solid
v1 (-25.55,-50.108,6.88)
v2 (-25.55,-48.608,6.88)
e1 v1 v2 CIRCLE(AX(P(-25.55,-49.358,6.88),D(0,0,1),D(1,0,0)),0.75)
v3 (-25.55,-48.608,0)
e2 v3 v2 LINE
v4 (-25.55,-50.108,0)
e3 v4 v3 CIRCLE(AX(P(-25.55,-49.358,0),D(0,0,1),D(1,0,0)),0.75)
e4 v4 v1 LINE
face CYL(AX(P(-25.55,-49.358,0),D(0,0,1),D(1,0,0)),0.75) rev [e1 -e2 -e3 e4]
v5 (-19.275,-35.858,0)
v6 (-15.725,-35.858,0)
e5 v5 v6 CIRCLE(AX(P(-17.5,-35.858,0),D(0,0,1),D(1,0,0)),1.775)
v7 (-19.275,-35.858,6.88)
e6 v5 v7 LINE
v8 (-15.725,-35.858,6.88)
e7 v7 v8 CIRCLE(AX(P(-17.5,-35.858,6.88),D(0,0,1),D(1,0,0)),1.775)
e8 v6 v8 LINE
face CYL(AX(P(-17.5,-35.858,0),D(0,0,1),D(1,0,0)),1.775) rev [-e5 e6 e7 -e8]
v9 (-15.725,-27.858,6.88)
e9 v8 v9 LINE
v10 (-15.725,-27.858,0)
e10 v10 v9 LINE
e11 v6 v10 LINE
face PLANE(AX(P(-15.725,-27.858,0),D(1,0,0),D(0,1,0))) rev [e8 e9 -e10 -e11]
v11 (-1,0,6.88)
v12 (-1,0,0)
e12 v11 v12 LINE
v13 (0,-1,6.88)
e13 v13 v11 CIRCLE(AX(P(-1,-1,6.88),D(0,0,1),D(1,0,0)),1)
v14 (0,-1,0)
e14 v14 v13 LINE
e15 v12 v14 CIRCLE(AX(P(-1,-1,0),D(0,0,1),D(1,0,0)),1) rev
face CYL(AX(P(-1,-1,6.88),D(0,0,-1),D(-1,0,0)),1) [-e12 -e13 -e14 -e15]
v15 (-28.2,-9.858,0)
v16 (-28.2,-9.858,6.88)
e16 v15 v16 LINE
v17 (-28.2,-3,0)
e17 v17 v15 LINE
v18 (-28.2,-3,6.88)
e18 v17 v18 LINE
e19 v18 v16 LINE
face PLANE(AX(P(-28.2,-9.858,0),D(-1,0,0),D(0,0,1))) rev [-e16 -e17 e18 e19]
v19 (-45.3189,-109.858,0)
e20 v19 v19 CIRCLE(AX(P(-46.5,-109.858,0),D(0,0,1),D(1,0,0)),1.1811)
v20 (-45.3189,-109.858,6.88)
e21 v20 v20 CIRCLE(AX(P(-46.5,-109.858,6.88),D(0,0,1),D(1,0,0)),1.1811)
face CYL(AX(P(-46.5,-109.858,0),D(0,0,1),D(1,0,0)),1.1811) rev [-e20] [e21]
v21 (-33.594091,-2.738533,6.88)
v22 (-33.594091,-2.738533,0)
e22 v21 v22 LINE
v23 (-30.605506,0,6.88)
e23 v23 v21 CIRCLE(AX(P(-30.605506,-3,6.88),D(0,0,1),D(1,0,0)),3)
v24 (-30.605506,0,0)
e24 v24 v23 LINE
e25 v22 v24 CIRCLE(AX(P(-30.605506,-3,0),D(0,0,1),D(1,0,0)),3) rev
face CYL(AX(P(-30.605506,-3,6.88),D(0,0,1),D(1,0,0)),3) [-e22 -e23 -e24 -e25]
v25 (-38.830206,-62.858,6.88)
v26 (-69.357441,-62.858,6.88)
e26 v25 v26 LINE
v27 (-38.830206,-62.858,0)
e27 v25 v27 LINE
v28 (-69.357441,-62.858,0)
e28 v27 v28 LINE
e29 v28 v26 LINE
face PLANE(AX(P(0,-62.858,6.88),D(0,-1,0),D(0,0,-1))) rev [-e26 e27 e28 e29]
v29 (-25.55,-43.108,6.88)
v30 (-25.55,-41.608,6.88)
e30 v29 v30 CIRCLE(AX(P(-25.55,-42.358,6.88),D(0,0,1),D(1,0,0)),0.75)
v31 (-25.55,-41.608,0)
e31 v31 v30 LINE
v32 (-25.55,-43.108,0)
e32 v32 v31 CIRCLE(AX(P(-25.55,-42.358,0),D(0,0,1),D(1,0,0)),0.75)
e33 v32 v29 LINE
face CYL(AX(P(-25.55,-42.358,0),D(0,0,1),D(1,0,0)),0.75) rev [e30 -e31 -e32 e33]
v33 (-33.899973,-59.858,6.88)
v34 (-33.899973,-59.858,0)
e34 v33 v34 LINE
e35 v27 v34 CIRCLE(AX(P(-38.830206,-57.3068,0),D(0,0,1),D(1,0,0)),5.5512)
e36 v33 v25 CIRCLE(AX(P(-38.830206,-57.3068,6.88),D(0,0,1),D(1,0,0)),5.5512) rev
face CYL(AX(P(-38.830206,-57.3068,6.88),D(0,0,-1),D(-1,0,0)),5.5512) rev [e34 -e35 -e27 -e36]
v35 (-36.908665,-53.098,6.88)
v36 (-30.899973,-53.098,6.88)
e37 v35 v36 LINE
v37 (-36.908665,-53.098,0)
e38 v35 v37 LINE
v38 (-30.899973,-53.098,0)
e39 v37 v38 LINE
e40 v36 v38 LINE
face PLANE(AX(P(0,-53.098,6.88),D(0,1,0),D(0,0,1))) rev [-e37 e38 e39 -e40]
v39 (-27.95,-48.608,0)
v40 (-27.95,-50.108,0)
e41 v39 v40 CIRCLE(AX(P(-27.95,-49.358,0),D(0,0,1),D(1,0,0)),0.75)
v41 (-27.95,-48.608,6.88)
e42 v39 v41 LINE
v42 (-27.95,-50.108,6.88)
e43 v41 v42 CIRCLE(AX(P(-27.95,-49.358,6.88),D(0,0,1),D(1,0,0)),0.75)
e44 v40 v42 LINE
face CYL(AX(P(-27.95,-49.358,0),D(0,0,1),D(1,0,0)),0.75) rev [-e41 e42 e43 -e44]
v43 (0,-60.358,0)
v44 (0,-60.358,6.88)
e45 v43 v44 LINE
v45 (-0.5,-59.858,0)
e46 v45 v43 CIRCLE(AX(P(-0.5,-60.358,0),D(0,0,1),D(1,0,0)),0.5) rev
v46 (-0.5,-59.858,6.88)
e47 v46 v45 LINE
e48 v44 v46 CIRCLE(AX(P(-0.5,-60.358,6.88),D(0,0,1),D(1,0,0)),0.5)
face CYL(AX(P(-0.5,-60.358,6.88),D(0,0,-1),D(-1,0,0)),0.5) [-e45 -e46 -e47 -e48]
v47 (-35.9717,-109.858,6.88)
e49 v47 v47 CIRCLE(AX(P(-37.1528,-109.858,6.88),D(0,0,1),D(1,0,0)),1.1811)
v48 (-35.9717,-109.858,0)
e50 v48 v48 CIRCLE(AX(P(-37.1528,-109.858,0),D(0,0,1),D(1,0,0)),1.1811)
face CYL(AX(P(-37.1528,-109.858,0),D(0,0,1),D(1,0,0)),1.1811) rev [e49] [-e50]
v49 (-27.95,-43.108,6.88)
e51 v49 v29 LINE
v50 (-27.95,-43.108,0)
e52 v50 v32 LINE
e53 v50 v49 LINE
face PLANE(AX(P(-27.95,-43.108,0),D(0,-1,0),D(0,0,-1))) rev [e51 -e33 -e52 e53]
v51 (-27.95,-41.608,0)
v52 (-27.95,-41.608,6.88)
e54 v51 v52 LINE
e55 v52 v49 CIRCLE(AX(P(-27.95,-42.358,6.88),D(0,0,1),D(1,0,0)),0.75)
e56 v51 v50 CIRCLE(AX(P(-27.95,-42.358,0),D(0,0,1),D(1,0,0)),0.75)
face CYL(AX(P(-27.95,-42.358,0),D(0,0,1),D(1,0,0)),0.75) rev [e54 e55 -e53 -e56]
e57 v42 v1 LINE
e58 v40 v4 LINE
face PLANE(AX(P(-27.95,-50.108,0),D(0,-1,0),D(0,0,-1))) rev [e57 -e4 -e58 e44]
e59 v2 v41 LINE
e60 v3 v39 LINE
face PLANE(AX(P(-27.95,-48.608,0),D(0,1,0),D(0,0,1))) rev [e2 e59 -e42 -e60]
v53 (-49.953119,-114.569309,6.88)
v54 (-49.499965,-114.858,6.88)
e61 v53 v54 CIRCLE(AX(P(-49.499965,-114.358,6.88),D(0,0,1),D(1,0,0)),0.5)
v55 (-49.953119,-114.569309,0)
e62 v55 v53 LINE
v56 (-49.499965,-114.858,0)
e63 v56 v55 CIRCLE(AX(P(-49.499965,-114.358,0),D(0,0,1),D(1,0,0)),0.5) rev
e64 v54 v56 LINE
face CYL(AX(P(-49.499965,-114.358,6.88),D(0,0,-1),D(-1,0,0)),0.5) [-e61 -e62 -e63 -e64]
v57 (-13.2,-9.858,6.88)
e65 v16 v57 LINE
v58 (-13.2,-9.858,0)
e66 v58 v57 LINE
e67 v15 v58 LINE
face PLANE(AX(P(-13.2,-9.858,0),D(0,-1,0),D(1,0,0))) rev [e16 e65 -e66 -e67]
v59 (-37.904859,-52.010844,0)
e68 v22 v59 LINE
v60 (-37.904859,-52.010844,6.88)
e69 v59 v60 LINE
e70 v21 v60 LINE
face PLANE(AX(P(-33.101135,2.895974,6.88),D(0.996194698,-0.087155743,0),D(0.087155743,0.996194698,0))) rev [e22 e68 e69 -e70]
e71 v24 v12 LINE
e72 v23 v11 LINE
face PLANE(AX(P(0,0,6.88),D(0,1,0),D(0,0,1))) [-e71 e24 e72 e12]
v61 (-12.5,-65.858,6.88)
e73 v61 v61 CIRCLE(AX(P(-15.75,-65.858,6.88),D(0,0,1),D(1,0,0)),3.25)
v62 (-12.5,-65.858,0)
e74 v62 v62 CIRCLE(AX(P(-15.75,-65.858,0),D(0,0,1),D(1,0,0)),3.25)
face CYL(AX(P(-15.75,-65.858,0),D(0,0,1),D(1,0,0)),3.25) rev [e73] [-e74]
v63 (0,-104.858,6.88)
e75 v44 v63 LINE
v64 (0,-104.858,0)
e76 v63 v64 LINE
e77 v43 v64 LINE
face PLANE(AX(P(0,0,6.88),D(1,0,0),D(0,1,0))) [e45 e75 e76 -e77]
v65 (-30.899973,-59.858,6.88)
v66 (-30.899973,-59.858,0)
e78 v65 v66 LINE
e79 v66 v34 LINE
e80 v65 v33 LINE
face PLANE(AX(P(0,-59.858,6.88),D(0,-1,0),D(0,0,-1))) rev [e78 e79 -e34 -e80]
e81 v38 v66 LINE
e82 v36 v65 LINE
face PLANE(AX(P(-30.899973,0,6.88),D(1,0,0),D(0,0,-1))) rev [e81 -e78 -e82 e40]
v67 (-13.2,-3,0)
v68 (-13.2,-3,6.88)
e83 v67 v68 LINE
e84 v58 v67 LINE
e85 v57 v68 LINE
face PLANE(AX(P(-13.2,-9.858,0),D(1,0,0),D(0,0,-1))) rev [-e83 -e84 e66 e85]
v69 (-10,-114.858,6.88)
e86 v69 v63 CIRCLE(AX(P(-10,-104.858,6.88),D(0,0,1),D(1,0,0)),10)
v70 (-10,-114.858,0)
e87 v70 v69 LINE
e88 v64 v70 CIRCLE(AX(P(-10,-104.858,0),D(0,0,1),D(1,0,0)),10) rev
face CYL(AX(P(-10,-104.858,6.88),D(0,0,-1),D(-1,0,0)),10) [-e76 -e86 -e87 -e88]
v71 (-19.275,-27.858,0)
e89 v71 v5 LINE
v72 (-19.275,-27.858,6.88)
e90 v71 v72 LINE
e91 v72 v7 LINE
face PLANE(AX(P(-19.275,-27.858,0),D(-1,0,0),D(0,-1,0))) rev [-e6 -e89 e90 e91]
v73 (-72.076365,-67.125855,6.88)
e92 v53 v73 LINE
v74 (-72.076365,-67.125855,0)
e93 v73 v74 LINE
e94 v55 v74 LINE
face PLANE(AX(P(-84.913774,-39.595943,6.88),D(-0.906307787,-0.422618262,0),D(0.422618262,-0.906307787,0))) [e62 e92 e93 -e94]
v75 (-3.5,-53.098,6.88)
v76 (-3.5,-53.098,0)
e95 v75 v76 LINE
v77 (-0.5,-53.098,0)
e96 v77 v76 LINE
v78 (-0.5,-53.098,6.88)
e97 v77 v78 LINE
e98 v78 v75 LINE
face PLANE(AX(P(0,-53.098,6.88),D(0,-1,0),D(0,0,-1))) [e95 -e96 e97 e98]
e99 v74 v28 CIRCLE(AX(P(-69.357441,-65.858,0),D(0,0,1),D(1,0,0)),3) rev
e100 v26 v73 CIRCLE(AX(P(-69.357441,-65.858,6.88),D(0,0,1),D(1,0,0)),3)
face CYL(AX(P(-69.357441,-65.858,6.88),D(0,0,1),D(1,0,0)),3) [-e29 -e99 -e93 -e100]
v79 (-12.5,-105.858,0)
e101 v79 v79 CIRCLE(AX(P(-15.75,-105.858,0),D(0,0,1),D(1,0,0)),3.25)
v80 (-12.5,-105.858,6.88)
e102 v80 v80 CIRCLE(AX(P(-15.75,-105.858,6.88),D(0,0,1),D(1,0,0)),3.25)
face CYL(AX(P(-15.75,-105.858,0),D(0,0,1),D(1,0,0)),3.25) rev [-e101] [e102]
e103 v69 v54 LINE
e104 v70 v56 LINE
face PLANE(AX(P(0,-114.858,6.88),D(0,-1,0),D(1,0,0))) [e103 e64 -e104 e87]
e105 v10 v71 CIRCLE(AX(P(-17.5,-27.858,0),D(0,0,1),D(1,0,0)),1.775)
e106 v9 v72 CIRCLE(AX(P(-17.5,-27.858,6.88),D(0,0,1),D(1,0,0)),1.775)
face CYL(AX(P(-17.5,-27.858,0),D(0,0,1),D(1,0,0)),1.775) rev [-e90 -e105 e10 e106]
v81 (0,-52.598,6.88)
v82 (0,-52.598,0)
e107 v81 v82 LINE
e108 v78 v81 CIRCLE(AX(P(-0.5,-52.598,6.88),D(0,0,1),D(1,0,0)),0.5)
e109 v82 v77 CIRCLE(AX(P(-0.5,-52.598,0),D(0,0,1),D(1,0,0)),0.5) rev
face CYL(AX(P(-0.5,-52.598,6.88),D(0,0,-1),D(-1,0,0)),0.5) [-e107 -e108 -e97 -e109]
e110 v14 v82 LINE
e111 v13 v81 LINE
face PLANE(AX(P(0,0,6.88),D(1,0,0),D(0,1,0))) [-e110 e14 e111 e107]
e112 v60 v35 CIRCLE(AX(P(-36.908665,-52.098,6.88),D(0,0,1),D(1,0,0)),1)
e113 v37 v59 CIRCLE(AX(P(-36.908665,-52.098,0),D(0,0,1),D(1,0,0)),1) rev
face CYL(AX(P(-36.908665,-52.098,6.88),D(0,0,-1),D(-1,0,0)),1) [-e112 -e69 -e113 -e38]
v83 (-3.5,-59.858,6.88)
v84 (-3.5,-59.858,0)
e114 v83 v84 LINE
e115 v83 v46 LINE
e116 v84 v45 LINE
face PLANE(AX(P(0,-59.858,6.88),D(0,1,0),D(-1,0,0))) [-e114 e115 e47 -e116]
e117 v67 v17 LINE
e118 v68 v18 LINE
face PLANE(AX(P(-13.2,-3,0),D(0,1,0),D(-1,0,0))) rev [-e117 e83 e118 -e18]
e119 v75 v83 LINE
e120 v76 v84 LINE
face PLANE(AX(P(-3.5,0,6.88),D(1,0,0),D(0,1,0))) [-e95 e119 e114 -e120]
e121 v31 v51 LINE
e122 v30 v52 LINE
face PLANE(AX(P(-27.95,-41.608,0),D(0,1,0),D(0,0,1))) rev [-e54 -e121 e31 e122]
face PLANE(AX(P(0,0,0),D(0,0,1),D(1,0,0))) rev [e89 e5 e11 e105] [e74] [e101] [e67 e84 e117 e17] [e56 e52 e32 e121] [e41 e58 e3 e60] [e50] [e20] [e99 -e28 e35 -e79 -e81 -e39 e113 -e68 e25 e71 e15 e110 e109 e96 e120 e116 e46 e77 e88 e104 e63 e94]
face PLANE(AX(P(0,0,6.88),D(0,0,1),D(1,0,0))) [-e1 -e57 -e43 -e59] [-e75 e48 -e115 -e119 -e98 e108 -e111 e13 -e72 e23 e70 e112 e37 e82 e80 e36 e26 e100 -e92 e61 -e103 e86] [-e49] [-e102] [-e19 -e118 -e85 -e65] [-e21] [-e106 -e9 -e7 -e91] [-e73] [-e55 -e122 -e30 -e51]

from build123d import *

# Parameters (mm, degrees)
BOSS_EXTRUDE1_DEPTH = 6.88
SKETCH2_W           = 15
SKETCH2_H           = 6.858
CUT_EXTRUDE1_DEPTH  = 137.841297579
SKETCH3_R           = 3.25
CUT_EXTRUDE2_DEPTH  = 137.841297579
SKETCH4_R           = 1.1811
CUT_EXTRUDE3_DEPTH  = 137.841297579
CUT_EXTRUDE4_DEPTH  = 137.841297579
FILLET1_R           = 10
FILLET2_R           = 3
FILLET3_R           = 0.5
FILLET4_R           = 1
FILLET5_R           = 5.5512


with BuildPart() as part:
    # Sketch1 → Boss-Extrude1 (new body)
    with BuildSketch(Plane.XY):
        Polygon((-33.3545, 0), (0, 0), (0, -53.098), (-3.5, -53.098), (-3.5, -59.858), (0, -59.858), (0, -114.858), (-49.8185, -114.858), (-74.066498224, -62.858), (-33.899973056, -62.858), (-33.899973056, -59.858), (-30.899973056, -59.858), (-30.899973056, -53.098), (-37.999973056, -53.098), align=None)
    extrude(amount=BOSS_EXTRUDE1_DEPTH)

    # Sketch2 → Cut-Extrude1 (cut, through all)
    with BuildSketch(Plane.XY.offset(6.88)):
        with Locations((-20.7, -6.429)):
            Rectangle(SKETCH2_W, SKETCH2_H)
    extrude(amount=-CUT_EXTRUDE1_DEPTH, mode=Mode.SUBTRACT)

    # Sketch3 → Cut-Extrude2 (cut, through all)
    with BuildSketch(Plane.XY.offset(6.88)):
        with Locations((-15.75, -65.858)):
            Circle(SKETCH3_R)
        with Locations((-15.75, -105.858)):
            Circle(SKETCH3_R)
    extrude(amount=-CUT_EXTRUDE2_DEPTH, mode=Mode.SUBTRACT)

    # Sketch4 → Cut-Extrude3 (cut, through all)
    with BuildSketch(Plane.XY.offset(6.88)):
        with Locations((-46.5, -109.858)):
            Circle(SKETCH4_R)
        with Locations((-37.1528, -109.858)):
            Circle(SKETCH4_R)
        with BuildLine():
            Line((-27.95, -48.608), (-25.55, -48.608))
            ThreePointArc((-25.55, -48.608), (-24.8, -49.358), (-25.55, -50.108))
            Line((-25.55, -50.108), (-27.95, -50.108))
            ThreePointArc((-27.95, -50.108), (-28.7, -49.358), (-27.95, -48.608))
        make_face()
        with BuildLine():
            Line((-27.95, -41.608), (-25.55, -41.608))
            ThreePointArc((-25.55, -41.608), (-24.8, -42.358), (-25.55, -43.108))
            Line((-25.55, -43.108), (-27.95, -43.108))
            ThreePointArc((-27.95, -43.108), (-28.7, -42.358), (-27.95, -41.608))
        make_face()
    extrude(amount=-CUT_EXTRUDE3_DEPTH, mode=Mode.SUBTRACT)

    # Sketch5 → Cut-Extrude4 (cut, through all)
    with BuildSketch(Plane.XY.offset(6.88)):
        with BuildLine():
            Line((-15.725, -27.858), (-15.725, -35.858))
            ThreePointArc((-15.725, -35.858), (-17.5, -37.633), (-19.275, -35.858))
            Line((-19.275, -35.858), (-19.275, -27.858))
            ThreePointArc((-19.275, -27.858), (-17.5, -26.083), (-15.725, -27.858))
        make_face()
    extrude(amount=-CUT_EXTRUDE4_DEPTH, mode=Mode.SUBTRACT)

    # Fillet1
    fillet1_edges = [part.edges().sort_by_distance(p)[0] for p in [
        (0, -114.858, 3.44),
    ]]
    fillet(fillet1_edges, radius=FILLET1_R)

    # Fillet2
    fillet2_edges = [part.edges().sort_by_distance(p)[0] for p in [
        (-74.066498224, -62.858, 3.44),
        (-33.3545, 0, 3.44),
    ]]
    fillet(fillet2_edges, radius=FILLET2_R)

    # Fillet3
    fillet3_edges = [part.edges().sort_by_distance(p)[0] for p in [
        (0, -53.098, 3.44),
        (0, -59.858, 3.44),
        (-49.8185, -114.858, 3.44),
    ]]
    fillet(fillet3_edges, radius=FILLET3_R)

    # Fillet4
    fillet4_edges = [part.edges().sort_by_distance(p)[0] for p in [
        (0, 0, 3.44),
        (-37.999973056, -53.098, 3.44),
    ]]
    fillet(fillet4_edges, radius=FILLET4_R)

    # Fillet5
    # the kernel refuses this fillet: 5.5512 mm, written as the material it adds along each edge
    with BuildSketch(Plane(origin=(-33.899973056, -62.858, 0), x_dir=(0, 1, 0), z_dir=(0, 0, 1))) as fillet5_piece_1:
        with BuildLine():
            CenterArc((5.5512, 4.93023326), FILLET5_R, 180, 62.640229199)
            Line((0, 4.93023326), (-0.111024, 4.93023326))
            Line((-0.111024, 4.93023326), (-0.111024, 0))
            Line((-0.111024, 0), (0, -0.111024))
            ThreePointArc((0, -0.111024), (1.5, -0.111024), (2.948976, -0.098604665))
            Line((2.948976, -0.098604665), (3, 0))
        make_face()
    extrude(amount=6.88)


solid = part.part
